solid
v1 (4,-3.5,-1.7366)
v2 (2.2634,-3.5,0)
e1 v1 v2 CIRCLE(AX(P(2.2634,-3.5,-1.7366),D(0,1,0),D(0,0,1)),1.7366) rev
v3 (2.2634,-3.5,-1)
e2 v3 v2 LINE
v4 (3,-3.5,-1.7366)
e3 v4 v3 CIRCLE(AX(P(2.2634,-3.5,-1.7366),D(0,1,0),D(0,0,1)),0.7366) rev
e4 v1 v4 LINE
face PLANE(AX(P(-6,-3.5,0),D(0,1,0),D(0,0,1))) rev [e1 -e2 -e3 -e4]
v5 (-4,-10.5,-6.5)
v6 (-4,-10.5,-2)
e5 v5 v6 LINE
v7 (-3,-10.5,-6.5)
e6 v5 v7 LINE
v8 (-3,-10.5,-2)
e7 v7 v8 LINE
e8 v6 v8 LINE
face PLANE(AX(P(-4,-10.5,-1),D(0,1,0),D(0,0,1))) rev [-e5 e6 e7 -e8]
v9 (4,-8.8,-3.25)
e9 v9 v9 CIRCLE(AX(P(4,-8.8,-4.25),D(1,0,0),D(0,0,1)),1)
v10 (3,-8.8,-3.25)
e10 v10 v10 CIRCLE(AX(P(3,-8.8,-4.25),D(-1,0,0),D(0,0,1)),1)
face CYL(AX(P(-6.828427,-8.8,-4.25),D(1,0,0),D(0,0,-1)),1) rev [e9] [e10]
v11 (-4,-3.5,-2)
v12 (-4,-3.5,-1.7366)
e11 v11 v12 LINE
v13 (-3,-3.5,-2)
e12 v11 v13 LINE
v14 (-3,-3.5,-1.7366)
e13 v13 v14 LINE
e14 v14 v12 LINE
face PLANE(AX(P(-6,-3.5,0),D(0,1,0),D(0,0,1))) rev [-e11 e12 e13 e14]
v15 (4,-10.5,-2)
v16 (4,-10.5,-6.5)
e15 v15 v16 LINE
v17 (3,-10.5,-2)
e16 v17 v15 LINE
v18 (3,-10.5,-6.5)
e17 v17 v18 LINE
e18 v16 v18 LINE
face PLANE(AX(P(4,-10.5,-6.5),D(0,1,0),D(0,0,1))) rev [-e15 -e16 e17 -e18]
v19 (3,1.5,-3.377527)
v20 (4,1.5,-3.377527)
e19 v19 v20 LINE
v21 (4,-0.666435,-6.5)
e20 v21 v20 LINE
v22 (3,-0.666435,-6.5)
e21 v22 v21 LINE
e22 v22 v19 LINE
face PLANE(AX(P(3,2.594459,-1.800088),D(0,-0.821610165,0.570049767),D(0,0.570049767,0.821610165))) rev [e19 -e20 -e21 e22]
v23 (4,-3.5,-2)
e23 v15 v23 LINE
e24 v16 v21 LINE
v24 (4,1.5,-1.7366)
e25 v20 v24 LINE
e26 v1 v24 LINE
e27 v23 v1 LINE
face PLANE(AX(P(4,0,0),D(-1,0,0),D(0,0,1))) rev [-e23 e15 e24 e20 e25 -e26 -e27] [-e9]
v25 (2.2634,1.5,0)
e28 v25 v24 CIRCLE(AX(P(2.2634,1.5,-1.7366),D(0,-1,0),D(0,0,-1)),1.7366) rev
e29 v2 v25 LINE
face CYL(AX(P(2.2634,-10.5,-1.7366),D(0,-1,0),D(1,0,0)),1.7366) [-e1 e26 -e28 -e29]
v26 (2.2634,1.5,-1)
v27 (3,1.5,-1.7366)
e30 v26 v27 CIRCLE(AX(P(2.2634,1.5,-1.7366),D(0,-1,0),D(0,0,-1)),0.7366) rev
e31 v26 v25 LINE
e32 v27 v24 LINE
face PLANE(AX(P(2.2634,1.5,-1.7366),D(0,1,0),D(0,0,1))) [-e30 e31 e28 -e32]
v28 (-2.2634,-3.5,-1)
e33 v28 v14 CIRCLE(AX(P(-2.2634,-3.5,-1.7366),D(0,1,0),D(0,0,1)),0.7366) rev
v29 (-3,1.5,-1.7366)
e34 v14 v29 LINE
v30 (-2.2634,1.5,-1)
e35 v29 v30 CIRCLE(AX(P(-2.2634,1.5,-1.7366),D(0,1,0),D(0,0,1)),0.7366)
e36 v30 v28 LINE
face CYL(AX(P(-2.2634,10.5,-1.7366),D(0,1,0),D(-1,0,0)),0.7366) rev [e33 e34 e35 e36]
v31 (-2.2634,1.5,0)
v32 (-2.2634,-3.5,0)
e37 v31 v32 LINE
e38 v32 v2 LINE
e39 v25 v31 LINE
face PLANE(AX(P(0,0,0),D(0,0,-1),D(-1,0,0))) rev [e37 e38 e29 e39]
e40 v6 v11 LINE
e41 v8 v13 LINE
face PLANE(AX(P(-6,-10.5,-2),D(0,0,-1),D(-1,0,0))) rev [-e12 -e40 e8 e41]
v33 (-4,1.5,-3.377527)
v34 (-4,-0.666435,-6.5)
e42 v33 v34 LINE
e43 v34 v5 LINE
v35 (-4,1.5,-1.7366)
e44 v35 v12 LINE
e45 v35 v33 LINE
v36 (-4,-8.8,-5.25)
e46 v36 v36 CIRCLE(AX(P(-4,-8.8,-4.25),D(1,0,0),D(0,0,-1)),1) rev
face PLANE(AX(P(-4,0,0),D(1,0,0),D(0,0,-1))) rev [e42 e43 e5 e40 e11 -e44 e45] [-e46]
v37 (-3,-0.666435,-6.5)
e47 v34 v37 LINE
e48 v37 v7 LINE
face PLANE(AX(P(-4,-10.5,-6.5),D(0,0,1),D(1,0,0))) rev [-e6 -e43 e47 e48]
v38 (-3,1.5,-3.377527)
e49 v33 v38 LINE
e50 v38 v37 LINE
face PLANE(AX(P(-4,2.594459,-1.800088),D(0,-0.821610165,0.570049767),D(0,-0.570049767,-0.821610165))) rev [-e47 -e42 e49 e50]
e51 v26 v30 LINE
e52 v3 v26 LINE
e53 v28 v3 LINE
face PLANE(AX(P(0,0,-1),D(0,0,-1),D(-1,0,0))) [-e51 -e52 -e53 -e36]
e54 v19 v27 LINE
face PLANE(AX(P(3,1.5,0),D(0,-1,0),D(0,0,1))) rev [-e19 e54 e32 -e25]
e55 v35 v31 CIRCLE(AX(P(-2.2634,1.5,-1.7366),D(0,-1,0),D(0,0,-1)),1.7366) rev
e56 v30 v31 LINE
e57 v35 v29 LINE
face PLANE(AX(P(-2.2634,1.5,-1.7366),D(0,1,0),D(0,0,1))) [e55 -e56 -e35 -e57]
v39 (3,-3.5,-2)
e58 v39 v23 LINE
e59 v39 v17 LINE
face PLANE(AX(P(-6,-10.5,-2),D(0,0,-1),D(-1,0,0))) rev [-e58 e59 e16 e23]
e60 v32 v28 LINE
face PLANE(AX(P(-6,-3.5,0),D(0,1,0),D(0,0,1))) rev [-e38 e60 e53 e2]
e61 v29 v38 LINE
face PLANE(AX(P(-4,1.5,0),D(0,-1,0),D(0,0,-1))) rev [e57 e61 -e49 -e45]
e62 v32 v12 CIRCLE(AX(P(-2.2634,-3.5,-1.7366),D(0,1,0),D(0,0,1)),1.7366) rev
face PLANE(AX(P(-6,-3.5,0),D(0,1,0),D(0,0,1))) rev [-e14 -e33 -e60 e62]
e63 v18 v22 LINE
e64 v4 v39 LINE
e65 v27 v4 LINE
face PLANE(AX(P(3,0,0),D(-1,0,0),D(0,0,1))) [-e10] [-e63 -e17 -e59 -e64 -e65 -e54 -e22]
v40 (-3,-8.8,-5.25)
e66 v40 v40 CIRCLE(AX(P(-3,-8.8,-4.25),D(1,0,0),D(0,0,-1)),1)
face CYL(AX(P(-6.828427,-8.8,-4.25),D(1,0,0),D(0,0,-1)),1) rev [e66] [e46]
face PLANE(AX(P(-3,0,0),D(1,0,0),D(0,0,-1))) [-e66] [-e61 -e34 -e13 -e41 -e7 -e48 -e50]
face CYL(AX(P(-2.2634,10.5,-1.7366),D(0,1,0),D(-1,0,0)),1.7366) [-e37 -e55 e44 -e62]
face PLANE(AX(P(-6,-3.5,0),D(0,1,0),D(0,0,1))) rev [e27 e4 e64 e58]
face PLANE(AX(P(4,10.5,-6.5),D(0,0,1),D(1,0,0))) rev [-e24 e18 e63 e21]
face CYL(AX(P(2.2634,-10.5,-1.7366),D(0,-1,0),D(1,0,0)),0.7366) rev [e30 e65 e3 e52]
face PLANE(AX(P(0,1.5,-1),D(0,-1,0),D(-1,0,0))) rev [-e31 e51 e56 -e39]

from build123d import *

# Parameters (mm, degrees)
CROQUIS1_W                         = 8
CROQUIS1_H                         = 21
BRIDA_BASE1_DEPTH                  = 1
BRIDA_DE_ARISTA1_STRIP_W           = 5.4732
BRIDA_DE_ARISTA1_STRIP_H           = 1
BRIDA_DE_ARISTA1_STRIP_CUT_DEPTH   = 21
BRIDA_DE_ARISTA1_STRIP_2_W         = 5.4732
BRIDA_DE_ARISTA1_STRIP_2_H         = 1
BRIDA_DE_ARISTA1_STRIP_CUT_2_DEPTH = 21
BRIDA_DE_ARISTA1_DEPTH             = 21
BRIDA_DE_ARISTA1_BEND_DEPTH        = 21
CROQUIS34_W                        = 2
CROQUIS34_H                        = 7
CORTAR_EXTRUIR1_DEPTH              = 10
CORTAR_EXTRUIR2_REACH              = 16.714
CROQUIS35_R                        = 1
CORTAR_EXTRUIR3_DEPTH              = 10


# Sheet-metal steps are written as plain solids
with BuildPart() as part:
    # Croquis1 → Brida base1 (new body)
    with BuildSketch(Plane.XY):
        Rectangle(CROQUIS1_W, CROQUIS1_H)
    extrude(amount=-BRIDA_BASE1_DEPTH)

    # Brida de arista1 strip (across the edge) → Brida de arista1 strip cut (cut)
    with BuildSketch(Plane(origin=(-4, -10.5, -1), x_dir=(1, 0, 0), z_dir=(0, 1, 0))):
        with Locations((-1, -0.5)):
            Rectangle(BRIDA_DE_ARISTA1_STRIP_W, BRIDA_DE_ARISTA1_STRIP_H)
    extrude(amount=BRIDA_DE_ARISTA1_STRIP_CUT_DEPTH, mode=Mode.SUBTRACT)

    # Brida de arista1 strip 2 (across the edge) → Brida de arista1 strip cut 2 (cut)
    with BuildSketch(Plane(origin=(4, 10.5, -1), x_dir=(-1, 0, 0), z_dir=(0, -1, 0))):
        with Locations((-1, -0.5)):
            Rectangle(BRIDA_DE_ARISTA1_STRIP_2_W, BRIDA_DE_ARISTA1_STRIP_2_H)
    extrude(amount=BRIDA_DE_ARISTA1_STRIP_CUT_2_DEPTH, mode=Mode.SUBTRACT)

    # Brida de arista1 section (across the edge) → Brida de arista1 (add)
    with BuildSketch(Plane(origin=(-4, -10.5, -1), x_dir=(1, 0, 0), z_dir=(0, 1, 0))):
        with BuildLine():
            Line((0, 0.7366), (0, 5.5))
            Line((0, 5.5), (1, 5.5))
            Line((1, 5.5), (1, 0.7366))
            ThreePointArc((1, 0.7366), (1.215745145, 0.215745145), (1.7366, 0))
            Line((1.7366, 0), (1.7366, -1))
            ThreePointArc((1.7366, -1), (0.508638364, -0.491361636), (0, 0.7366))
        make_face()
    extrude(amount=BRIDA_DE_ARISTA1_DEPTH)

    # Brida de arista1 section 2 (across the edge) → Brida de arista1 bend (add)
    with BuildSketch(Plane(origin=(4, 10.5, -1), x_dir=(-1, 0, 0), z_dir=(0, -1, 0))):
        with BuildLine():
            Line((0, 0.7366), (0, 5.5))
            Line((0, 5.5), (1, 5.5))
            Line((1, 5.5), (1, 0.7366))
            ThreePointArc((1, 0.7366), (1.215745145, 0.215745145), (1.7366, 0))
            Line((1.7366, 0), (1.7366, -1))
            ThreePointArc((1.7366, -1), (0.508638364, -0.491361636), (0, 0.7366))
        make_face()
    extrude(amount=BRIDA_DE_ARISTA1_BEND_DEPTH)

    # Croquis34 → Cortar-Extruir1 (cut)
    with BuildSketch(Plane(origin=(4, 0, 0), x_dir=(0, 0, -1), z_dir=(1, 0, 0))):
        with Locations((1, 7)):
            Rectangle(CROQUIS34_W, CROQUIS34_H)
        with Locations((1, -7)):
            Rectangle(CROQUIS34_W, CROQUIS34_H)
    extrude(amount=-CORTAR_EXTRUIR1_DEPTH, mode=Mode.SUBTRACT)

    # Cortar-Extruir2: up to this face of the body (flat: up to its plane)
    cortar_extruir2_end = Plane(part.part.faces().sort_by_distance((-4, 0, -4.204419709))[0])
    # Croquis35 → Cortar-Extruir2 (cut, up to the picked face)
    with BuildSketch(Plane(origin=(4, 0, 0), x_dir=(0, 0, -1), z_dir=(1, 0, 0)), mode=Mode.PRIVATE) as cortar_extruir2_sk1:
        with Locations((4.25, 8.8)):
            Circle(CROQUIS35_R)
    cortar_extruir2_tool1 = split(extrude(cortar_extruir2_sk1.sketch, amount=-CORTAR_EXTRUIR2_REACH, mode=Mode.PRIVATE), bisect_by=cortar_extruir2_end, keep=Keep.BOTH, mode=Mode.PRIVATE)
    # Croquis35 → Cortar-Extruir2 (cut, up to the picked face)
    with BuildSketch(Plane(origin=(4, 0, 0), x_dir=(0, 0, -1), z_dir=(1, 0, 0)), mode=Mode.PRIVATE) as cortar_extruir2_sk2:
        with Locations(Location((4.25, -8.8, 0), (0, 0, 180))):
            Circle(CROQUIS35_R)
    cortar_extruir2_tool2 = split(extrude(cortar_extruir2_sk2.sketch, amount=-CORTAR_EXTRUIR2_REACH, mode=Mode.PRIVATE), bisect_by=cortar_extruir2_end, keep=Keep.BOTH, mode=Mode.PRIVATE)
    add(cortar_extruir2_tool1.solids().sort_by(Axis((4, 8.8, -4.25), (-1, 0, 0)))[0], mode=Mode.SUBTRACT)
    add(cortar_extruir2_tool2.solids().sort_by(Axis((4, -8.8, -4.25), (-1, 0, 0)))[0], mode=Mode.SUBTRACT)

    # Croquis36 → Cortar-Extruir3 (cut)
    with BuildSketch(Plane(origin=(4, 0, 0), x_dir=(0, 0, -1), z_dir=(1, 0, 0))):
        Polygon((0, 1.5), (3.377527081, 1.5), (6.5, -0.666434932), (6.5, 11.157411488), (0, 11.157411488), align=None)
    extrude(amount=-CORTAR_EXTRUIR3_DEPTH, mode=Mode.SUBTRACT)


solid = part.part
